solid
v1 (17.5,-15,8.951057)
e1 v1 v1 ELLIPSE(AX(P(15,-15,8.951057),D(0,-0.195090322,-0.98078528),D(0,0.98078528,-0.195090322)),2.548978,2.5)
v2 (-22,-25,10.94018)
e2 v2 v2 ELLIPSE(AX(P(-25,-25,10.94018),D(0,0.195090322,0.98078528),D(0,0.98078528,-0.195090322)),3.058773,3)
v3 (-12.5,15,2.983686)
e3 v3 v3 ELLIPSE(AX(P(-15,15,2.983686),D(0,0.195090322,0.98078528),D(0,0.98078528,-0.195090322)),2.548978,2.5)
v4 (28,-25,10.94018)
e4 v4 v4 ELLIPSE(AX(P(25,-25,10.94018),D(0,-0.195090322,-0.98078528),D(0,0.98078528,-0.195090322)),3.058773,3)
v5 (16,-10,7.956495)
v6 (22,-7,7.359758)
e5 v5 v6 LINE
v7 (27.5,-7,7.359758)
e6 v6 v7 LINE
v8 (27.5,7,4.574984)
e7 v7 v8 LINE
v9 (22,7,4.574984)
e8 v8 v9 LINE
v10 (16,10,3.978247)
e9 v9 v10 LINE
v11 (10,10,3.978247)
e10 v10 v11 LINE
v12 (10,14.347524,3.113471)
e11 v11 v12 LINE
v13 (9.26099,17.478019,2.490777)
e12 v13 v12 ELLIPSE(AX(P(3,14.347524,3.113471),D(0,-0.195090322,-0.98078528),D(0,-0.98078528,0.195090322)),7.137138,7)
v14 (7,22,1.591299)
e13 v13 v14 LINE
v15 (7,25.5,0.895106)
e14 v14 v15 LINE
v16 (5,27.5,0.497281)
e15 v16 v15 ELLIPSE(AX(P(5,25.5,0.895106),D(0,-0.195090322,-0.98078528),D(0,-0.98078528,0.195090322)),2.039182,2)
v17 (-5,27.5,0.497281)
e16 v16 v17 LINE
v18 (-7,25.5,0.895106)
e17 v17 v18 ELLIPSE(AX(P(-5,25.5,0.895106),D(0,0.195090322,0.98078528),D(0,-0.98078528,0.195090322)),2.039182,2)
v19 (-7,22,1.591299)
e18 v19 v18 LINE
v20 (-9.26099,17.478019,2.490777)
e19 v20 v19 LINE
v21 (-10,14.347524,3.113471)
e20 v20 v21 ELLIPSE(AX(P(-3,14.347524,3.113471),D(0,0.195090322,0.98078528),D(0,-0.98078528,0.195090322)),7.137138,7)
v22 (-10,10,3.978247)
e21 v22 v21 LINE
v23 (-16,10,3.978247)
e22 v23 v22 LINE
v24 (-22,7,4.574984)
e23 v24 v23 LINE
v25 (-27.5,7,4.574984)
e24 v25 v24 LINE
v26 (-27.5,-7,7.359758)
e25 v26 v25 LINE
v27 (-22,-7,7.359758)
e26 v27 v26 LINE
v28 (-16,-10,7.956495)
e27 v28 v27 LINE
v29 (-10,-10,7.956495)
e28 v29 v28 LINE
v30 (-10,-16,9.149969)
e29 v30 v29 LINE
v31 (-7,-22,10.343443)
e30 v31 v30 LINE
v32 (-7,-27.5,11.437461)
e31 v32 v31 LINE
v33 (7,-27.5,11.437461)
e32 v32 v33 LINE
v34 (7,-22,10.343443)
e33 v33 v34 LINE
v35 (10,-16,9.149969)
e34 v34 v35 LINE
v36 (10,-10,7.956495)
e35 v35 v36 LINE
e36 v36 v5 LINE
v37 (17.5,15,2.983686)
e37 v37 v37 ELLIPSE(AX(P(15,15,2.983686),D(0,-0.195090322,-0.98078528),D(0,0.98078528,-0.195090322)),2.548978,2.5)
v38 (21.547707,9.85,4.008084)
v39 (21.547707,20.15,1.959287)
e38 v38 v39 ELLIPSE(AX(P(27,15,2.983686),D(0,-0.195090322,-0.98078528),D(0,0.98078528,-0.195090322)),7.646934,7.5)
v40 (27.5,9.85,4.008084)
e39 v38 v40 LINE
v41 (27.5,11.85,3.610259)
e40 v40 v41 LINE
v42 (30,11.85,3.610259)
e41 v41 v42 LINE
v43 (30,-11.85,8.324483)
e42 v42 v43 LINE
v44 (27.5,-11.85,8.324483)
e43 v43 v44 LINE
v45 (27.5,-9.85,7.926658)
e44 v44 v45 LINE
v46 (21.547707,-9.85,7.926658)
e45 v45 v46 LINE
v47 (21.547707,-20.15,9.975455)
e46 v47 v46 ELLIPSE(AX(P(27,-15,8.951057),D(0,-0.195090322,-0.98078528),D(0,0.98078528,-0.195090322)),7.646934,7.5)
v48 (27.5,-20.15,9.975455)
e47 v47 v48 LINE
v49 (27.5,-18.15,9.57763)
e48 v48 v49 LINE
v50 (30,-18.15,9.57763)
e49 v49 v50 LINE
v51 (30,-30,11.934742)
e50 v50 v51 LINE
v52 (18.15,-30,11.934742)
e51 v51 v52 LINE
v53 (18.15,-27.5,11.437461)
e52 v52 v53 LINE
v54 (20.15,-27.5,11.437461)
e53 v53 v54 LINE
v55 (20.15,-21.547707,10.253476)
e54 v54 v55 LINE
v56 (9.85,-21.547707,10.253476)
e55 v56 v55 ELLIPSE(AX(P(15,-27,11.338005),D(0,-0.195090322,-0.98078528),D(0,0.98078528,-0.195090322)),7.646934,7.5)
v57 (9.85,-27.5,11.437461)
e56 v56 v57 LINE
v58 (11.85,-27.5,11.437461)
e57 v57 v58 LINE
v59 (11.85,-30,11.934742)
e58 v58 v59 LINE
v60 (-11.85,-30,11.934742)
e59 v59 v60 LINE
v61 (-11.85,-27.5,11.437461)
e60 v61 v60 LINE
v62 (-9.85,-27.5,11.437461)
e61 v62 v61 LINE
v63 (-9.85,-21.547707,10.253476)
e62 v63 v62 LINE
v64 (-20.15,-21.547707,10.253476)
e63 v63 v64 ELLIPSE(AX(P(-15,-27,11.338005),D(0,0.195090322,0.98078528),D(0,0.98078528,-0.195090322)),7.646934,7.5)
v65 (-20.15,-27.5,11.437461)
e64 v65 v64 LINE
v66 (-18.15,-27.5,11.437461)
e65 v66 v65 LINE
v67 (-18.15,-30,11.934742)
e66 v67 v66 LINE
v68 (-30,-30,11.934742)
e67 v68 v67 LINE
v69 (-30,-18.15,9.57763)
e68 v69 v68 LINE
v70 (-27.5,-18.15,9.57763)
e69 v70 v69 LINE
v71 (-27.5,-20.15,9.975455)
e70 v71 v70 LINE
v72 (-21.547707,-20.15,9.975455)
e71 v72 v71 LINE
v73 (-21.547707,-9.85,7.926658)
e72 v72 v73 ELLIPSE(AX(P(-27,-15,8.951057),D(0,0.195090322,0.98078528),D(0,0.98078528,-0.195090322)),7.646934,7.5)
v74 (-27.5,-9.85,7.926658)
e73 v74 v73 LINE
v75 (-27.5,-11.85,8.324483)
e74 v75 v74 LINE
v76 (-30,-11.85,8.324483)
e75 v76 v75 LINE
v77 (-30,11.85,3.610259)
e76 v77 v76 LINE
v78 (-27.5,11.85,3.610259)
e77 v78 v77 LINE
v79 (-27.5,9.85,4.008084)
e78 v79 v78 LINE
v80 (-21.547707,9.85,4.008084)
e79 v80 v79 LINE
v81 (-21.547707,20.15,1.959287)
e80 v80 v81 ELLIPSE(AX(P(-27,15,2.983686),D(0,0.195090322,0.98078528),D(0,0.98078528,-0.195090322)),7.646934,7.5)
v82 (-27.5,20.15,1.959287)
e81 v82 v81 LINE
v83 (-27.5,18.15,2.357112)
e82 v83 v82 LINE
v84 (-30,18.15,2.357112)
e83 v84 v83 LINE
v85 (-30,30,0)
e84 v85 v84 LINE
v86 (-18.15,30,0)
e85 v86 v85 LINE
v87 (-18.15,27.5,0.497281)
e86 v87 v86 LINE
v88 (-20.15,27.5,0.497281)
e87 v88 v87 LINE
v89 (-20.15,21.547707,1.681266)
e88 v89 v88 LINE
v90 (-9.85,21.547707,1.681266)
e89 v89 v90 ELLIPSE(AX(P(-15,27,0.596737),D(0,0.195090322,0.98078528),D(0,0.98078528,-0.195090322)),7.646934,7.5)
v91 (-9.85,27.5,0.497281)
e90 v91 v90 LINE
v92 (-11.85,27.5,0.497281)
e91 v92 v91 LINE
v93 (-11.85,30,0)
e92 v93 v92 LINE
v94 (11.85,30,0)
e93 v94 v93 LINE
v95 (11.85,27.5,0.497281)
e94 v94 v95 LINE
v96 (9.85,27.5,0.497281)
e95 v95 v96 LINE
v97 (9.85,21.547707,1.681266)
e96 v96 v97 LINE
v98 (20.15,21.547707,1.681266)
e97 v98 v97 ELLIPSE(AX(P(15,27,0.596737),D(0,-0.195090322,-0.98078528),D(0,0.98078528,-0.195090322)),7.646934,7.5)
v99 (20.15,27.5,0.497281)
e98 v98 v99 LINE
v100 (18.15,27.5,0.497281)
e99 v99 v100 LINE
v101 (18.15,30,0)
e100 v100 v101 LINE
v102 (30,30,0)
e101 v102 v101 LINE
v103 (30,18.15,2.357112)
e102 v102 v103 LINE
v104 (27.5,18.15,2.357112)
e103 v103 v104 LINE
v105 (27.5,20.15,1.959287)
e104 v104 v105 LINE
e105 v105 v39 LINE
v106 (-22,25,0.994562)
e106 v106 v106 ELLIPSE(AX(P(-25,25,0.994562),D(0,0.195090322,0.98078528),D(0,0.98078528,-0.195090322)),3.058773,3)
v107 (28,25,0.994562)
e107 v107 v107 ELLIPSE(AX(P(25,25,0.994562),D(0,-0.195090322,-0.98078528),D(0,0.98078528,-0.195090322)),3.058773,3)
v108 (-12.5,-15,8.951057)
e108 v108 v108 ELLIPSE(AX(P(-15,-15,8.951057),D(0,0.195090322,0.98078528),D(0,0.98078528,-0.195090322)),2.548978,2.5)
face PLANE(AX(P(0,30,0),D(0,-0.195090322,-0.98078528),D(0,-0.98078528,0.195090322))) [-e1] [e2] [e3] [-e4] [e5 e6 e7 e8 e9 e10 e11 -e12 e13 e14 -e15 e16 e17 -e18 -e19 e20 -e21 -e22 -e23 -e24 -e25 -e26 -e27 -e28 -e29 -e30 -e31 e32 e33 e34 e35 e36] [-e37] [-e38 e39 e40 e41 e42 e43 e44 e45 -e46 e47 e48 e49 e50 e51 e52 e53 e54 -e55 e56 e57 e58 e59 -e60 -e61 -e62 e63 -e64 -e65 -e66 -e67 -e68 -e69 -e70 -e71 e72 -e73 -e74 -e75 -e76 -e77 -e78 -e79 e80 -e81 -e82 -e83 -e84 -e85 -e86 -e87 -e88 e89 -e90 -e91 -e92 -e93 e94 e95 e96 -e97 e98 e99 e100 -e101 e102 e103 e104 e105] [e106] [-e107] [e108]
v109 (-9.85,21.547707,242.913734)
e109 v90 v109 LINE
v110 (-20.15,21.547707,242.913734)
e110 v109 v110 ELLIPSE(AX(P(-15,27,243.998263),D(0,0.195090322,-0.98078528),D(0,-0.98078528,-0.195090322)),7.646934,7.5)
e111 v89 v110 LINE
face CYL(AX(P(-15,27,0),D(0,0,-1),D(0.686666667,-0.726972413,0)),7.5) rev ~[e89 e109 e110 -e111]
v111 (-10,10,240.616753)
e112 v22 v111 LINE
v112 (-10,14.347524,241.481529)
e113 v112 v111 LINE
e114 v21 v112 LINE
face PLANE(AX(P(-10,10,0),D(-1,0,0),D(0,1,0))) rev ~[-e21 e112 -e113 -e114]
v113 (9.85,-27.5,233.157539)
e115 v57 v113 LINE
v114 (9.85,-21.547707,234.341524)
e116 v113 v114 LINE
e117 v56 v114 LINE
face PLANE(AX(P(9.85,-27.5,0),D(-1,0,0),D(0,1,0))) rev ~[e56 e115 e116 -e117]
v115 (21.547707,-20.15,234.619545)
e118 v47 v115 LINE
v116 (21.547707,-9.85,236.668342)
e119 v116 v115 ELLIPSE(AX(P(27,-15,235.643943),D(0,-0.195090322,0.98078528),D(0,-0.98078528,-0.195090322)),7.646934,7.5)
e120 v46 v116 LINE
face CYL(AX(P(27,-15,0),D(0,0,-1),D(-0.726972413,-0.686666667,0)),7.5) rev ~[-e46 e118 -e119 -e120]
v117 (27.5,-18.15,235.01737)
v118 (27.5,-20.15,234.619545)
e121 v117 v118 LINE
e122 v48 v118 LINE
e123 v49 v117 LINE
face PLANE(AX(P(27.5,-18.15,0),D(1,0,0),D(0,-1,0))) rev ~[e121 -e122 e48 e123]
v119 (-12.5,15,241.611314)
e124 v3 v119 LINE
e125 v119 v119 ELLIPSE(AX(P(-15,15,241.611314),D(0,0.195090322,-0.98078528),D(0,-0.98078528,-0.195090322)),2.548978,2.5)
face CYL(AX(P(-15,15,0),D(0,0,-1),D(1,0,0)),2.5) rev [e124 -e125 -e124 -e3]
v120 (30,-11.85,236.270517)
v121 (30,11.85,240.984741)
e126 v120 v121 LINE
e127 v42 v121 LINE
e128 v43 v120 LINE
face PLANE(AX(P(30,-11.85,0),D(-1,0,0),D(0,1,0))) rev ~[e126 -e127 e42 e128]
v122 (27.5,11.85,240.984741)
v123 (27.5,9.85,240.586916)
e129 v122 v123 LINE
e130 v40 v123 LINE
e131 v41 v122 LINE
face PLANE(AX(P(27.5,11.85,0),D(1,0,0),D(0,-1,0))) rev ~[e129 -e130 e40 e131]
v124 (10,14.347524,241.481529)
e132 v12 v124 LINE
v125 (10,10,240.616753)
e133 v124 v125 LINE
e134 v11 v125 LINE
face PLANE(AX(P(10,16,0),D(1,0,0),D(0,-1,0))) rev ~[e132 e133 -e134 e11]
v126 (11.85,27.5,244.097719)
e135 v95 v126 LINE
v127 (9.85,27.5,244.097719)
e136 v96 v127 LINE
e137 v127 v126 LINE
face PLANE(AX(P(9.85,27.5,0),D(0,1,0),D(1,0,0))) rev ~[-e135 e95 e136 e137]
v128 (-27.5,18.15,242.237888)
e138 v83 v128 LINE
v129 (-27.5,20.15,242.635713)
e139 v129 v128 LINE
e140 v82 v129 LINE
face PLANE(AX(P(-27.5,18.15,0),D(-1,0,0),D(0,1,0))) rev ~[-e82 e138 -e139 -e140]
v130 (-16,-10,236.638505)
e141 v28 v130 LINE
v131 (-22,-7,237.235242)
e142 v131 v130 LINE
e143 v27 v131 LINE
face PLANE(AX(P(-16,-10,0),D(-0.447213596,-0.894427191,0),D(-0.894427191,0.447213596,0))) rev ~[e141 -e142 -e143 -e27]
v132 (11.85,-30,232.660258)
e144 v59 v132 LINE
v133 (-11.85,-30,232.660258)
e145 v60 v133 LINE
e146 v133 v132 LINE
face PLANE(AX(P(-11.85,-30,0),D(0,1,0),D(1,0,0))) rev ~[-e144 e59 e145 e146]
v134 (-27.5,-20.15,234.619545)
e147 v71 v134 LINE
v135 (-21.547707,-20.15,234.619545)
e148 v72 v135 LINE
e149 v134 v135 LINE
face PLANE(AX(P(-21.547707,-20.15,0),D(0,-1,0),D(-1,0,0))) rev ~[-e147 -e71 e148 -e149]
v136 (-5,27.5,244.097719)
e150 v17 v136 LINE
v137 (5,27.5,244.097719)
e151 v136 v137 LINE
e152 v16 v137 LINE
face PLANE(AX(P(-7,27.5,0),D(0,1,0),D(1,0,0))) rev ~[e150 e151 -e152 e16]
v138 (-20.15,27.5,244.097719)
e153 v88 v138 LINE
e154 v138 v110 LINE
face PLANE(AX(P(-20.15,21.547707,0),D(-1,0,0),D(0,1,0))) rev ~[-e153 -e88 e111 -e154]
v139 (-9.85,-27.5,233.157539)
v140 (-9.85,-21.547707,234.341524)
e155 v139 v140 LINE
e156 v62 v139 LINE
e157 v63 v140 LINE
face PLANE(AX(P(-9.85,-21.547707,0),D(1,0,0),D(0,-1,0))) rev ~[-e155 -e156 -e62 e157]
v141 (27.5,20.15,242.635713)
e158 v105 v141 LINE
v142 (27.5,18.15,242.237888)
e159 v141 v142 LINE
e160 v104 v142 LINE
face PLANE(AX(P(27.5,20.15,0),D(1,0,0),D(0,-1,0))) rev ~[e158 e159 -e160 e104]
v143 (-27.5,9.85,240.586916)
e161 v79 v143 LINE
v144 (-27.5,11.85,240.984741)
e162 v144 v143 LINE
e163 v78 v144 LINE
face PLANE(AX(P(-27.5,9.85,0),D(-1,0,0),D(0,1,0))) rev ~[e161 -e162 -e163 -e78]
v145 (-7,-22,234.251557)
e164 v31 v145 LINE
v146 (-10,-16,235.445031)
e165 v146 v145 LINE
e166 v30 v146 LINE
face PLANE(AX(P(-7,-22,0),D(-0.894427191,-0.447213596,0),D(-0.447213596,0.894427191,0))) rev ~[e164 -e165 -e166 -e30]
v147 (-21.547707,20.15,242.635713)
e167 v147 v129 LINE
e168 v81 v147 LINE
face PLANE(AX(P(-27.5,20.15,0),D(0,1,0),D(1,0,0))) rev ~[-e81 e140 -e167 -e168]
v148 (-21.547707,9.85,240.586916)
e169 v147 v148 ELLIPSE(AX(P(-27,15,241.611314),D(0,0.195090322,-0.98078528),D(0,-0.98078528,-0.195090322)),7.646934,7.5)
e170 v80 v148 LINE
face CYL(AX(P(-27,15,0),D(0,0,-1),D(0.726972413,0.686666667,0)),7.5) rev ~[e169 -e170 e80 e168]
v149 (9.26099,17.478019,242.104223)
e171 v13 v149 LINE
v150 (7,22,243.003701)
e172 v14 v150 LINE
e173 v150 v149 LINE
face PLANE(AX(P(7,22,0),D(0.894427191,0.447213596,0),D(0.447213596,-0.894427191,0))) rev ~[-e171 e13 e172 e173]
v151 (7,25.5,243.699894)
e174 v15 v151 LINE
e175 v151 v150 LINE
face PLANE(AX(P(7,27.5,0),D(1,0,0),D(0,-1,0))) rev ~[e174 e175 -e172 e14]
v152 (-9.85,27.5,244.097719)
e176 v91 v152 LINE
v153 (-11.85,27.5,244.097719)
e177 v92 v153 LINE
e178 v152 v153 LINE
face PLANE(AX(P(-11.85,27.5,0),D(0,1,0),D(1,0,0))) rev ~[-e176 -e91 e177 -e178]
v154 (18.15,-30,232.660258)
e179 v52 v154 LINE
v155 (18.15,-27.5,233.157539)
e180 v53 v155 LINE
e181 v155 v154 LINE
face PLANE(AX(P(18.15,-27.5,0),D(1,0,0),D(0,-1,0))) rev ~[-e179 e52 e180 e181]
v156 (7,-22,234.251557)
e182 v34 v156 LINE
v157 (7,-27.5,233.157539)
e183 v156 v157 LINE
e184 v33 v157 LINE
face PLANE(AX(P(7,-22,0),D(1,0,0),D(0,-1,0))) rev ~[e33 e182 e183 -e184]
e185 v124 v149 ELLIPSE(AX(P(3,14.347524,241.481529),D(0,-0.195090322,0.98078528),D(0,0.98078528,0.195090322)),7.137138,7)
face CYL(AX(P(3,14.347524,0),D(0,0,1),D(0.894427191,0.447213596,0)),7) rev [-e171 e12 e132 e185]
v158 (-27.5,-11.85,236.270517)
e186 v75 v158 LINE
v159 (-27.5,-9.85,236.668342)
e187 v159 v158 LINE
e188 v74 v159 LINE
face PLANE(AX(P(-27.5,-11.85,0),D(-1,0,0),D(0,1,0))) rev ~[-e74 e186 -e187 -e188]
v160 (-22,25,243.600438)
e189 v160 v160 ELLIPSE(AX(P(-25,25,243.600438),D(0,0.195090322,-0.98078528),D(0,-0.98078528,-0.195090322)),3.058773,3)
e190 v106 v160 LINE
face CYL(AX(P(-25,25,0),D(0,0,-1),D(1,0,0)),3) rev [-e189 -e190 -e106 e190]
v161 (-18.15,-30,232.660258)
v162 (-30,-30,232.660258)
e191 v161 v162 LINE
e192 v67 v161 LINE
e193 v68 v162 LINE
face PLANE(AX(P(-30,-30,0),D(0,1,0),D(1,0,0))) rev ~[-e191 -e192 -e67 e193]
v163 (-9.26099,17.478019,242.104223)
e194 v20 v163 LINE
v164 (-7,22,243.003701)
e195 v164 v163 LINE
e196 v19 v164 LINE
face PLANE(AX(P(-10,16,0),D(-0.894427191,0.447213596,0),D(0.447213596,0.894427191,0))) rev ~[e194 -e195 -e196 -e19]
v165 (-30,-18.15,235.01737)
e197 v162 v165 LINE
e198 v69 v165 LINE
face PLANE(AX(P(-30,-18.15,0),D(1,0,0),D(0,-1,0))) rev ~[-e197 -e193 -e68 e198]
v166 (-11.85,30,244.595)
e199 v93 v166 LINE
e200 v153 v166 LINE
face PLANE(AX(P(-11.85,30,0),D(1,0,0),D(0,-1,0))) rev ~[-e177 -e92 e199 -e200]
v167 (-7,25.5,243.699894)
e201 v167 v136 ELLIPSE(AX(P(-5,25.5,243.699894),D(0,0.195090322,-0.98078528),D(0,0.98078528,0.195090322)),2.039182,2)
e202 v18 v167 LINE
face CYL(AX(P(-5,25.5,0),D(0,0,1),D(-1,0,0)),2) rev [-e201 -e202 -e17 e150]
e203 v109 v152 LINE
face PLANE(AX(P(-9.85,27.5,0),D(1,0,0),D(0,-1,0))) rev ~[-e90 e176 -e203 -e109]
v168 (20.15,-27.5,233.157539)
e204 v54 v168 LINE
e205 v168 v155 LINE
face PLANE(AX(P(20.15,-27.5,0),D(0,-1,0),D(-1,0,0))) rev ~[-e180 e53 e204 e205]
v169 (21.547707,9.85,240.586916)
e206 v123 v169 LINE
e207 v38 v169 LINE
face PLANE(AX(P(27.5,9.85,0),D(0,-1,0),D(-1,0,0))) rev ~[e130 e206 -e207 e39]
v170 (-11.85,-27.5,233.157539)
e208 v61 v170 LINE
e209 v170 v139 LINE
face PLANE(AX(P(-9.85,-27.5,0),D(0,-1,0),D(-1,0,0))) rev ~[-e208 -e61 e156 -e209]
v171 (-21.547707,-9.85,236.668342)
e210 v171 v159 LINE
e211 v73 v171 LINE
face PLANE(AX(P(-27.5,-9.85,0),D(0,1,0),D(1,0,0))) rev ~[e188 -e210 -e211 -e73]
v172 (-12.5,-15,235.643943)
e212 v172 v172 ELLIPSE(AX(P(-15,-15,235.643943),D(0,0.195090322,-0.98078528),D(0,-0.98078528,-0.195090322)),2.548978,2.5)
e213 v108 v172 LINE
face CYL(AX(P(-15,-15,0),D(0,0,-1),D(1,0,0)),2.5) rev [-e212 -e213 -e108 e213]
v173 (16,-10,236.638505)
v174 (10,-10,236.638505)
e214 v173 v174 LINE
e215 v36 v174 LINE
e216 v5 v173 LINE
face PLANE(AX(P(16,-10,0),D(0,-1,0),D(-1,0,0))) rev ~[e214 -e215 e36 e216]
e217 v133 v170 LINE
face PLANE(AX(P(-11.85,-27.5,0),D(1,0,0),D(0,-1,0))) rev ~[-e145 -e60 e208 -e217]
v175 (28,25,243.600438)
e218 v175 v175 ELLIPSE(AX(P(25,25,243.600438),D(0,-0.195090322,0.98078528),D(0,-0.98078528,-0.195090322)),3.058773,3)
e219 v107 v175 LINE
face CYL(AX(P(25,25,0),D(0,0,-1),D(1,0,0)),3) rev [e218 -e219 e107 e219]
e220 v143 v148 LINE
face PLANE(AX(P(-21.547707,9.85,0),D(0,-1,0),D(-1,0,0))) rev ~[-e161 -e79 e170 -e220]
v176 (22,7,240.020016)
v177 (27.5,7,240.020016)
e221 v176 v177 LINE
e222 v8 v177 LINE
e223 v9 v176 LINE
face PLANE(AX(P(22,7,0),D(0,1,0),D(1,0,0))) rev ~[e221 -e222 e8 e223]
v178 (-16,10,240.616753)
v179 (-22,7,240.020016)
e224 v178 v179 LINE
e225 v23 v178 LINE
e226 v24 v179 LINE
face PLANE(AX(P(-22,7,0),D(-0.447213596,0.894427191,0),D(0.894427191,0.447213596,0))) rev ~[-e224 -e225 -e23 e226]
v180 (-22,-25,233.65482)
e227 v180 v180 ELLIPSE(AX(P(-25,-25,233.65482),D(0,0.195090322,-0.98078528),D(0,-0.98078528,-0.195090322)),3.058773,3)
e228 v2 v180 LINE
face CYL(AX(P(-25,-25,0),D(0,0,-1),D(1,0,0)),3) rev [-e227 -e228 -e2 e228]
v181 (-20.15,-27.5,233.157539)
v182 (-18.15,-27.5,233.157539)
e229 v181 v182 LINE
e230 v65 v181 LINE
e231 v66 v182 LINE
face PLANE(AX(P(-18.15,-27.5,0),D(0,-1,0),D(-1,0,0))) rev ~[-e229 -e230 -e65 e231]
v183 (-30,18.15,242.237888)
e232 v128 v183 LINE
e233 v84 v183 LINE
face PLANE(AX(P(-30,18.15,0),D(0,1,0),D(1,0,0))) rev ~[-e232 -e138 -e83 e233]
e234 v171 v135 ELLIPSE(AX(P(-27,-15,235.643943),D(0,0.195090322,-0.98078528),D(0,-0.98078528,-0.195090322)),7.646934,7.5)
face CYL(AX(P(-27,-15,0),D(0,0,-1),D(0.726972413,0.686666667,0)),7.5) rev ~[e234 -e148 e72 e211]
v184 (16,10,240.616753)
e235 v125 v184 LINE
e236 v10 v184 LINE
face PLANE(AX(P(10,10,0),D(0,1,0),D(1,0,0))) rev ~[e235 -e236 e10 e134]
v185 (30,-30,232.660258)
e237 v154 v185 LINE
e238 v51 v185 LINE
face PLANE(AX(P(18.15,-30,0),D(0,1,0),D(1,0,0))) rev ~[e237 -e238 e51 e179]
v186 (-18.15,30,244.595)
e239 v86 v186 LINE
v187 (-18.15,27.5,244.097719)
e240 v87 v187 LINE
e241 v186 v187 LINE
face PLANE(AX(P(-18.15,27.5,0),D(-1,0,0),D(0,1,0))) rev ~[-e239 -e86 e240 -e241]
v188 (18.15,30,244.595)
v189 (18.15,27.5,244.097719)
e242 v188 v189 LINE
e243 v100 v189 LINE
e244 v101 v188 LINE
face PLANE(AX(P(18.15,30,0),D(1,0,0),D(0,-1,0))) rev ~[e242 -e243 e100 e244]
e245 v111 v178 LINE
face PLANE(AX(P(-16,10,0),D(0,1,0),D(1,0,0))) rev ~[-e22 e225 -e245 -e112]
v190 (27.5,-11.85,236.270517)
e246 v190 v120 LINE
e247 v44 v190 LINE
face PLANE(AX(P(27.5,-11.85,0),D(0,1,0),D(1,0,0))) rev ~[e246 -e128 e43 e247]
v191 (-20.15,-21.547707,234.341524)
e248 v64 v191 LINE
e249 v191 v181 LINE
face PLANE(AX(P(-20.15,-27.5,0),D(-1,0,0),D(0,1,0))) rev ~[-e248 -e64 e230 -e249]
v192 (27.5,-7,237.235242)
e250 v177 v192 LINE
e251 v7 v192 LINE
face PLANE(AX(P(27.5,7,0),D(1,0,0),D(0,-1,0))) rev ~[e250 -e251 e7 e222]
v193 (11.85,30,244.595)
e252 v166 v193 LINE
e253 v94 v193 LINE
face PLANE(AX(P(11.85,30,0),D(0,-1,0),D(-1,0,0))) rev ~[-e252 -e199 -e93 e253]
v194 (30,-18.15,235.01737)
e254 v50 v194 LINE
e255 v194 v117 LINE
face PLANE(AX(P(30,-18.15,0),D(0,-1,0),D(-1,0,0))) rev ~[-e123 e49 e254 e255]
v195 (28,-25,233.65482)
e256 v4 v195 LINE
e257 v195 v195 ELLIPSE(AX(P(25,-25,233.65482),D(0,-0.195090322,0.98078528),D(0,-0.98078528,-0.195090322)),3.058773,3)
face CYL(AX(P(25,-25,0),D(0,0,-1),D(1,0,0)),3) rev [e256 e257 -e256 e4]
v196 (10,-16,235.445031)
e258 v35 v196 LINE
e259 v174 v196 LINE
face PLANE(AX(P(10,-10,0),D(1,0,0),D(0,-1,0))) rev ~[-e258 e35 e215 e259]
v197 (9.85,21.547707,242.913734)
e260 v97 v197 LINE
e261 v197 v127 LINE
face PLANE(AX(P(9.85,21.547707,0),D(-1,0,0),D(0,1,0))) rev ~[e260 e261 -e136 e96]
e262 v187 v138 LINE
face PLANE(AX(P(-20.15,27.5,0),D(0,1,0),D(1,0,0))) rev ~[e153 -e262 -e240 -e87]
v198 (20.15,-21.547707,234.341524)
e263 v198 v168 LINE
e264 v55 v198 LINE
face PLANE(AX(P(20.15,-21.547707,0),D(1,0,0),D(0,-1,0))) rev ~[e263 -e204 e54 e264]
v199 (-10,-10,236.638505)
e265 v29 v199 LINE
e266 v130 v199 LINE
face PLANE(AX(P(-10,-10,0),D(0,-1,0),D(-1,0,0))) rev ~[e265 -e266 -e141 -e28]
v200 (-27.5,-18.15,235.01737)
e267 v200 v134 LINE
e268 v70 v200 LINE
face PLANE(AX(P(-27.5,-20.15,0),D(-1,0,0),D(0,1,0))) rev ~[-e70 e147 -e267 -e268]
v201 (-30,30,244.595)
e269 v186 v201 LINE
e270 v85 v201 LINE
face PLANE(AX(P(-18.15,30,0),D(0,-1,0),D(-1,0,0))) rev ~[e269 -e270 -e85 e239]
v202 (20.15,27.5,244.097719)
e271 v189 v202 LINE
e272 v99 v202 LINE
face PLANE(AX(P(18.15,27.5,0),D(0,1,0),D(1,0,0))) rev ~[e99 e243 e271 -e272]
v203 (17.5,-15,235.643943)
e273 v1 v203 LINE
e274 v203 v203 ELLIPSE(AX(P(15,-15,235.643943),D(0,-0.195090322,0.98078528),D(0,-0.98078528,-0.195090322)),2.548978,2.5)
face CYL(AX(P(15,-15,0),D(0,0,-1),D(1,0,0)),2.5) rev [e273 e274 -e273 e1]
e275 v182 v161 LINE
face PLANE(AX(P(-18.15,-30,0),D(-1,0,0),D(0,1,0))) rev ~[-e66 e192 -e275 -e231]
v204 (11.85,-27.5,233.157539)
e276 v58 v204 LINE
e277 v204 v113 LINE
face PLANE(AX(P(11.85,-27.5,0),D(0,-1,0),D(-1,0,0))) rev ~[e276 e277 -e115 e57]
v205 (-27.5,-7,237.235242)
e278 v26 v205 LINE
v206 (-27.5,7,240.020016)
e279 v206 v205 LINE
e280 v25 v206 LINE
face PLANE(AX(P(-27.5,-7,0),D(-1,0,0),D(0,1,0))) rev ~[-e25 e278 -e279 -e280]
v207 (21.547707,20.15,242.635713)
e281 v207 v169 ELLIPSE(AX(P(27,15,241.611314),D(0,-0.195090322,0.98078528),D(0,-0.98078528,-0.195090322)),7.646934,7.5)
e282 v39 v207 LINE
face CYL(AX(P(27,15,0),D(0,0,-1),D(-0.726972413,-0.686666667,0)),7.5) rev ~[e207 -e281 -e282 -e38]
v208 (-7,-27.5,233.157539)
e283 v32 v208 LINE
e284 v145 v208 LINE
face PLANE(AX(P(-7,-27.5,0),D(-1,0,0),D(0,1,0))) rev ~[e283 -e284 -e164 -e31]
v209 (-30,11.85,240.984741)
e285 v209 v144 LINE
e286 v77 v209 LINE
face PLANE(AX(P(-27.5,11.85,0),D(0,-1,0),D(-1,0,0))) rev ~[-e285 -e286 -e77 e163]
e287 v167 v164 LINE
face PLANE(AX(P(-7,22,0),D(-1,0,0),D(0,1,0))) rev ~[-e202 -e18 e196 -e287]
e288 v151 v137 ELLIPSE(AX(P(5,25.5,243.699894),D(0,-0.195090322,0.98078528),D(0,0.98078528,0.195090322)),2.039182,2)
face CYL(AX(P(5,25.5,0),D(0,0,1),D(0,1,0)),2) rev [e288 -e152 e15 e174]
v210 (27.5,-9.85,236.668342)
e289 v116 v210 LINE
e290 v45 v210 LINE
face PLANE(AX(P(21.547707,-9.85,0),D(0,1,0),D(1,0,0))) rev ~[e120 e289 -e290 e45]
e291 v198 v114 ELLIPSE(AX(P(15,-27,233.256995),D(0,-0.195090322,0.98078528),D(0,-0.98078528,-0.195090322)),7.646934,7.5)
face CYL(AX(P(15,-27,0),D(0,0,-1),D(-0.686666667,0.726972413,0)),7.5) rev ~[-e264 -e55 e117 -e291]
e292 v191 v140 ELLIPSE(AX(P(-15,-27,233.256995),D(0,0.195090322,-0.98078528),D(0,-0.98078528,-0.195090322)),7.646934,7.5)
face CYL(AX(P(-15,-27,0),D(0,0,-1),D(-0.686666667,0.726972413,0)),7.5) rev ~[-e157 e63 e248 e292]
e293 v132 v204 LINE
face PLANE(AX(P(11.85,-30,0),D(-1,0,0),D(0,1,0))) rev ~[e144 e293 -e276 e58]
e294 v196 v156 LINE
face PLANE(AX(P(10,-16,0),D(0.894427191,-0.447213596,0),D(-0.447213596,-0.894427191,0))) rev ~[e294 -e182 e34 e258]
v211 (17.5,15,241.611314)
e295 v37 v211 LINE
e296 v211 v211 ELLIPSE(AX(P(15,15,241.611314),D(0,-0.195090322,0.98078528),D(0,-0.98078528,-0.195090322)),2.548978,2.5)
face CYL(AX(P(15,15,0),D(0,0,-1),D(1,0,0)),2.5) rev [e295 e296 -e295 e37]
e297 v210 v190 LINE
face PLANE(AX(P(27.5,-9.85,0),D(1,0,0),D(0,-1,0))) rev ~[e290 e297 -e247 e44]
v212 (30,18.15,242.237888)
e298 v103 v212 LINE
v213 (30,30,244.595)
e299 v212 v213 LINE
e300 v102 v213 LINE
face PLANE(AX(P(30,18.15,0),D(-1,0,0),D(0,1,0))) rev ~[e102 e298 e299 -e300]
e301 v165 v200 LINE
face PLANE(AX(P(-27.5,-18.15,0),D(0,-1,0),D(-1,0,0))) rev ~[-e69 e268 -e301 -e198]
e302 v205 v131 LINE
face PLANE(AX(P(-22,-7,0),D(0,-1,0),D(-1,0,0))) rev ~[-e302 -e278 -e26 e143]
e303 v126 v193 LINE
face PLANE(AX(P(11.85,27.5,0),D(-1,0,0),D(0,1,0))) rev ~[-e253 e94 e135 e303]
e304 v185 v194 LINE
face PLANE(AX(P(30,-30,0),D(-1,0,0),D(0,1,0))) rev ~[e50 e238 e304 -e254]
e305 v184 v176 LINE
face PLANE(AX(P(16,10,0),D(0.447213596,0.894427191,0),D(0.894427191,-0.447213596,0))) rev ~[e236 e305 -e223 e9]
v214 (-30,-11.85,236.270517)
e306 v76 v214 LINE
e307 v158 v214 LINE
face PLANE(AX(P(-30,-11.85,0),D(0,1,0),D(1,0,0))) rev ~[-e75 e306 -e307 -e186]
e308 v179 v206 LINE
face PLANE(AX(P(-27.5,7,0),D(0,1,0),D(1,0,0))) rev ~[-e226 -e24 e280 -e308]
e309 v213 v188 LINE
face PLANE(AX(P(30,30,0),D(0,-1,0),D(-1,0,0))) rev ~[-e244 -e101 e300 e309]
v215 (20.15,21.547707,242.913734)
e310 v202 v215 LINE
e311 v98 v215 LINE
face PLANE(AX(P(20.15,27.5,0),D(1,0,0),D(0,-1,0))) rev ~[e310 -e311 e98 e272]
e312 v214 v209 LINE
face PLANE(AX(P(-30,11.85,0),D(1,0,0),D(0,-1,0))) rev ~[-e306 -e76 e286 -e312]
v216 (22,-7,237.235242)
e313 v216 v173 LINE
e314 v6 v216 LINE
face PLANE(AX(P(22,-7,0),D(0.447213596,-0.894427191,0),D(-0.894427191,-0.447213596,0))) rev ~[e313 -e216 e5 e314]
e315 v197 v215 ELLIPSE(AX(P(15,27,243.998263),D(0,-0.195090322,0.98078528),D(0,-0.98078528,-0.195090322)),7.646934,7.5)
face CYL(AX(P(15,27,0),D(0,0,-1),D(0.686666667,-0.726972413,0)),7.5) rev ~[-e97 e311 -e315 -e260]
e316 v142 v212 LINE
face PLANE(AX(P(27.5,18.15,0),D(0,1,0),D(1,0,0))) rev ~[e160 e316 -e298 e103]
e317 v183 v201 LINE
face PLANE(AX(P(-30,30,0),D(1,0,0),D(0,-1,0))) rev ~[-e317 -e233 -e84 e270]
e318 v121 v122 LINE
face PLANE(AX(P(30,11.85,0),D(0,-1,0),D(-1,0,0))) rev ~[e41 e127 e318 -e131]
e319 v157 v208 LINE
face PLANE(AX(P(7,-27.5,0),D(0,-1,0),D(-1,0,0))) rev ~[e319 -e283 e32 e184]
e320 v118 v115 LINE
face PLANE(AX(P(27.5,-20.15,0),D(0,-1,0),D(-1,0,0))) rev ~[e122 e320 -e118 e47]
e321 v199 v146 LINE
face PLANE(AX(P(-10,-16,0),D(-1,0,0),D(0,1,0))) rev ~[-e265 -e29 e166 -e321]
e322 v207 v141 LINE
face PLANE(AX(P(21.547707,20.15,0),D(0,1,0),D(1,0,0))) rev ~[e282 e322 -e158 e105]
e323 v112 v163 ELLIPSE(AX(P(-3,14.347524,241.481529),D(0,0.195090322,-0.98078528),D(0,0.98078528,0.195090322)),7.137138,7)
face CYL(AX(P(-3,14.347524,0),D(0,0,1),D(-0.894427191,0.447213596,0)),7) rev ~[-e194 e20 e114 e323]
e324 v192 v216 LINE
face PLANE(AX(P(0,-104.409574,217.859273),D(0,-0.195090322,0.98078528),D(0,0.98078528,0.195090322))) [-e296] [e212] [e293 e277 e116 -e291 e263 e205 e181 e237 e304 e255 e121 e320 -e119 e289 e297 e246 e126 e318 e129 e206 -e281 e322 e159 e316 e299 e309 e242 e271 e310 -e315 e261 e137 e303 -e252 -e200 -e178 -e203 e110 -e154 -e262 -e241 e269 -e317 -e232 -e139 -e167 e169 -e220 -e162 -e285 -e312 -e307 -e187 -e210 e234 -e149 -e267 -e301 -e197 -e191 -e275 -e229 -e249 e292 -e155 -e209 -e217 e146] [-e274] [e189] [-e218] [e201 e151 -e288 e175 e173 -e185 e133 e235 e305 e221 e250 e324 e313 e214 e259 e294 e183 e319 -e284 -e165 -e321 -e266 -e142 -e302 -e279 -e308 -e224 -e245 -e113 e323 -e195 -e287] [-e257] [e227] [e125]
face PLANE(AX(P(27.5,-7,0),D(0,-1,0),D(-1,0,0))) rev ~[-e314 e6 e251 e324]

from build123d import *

# Parameters (mm, degrees)
F0_R          = 3
F0_R_2        = 2.5
F1_DEPTH      = 244.595
F2_R          = 2
F3_R          = 7
F5_DEPTH      = 30
F5_DEPTH_BACK = 30


# Not quite as in the source:
# - a feature names something its author has since deleted; it is built from what else it names


with BuildPart() as f1:
    # F0 (on Top) → F1 (new body)
    with BuildSketch(Plane.XY):
        with BuildLine():
            Line((18.15, -30), (30, -30))
            Line((30, -30), (30, -18.15))
            Line((30, -18.15), (27.5, -18.15))
            Line((27.5, -18.15), (27.5, -20.15))
            Line((27.5, -20.15), (21.5477069044, -20.15))
            ThreePointArc((21.5477069044, -20.15), (19.5, -15), (21.5477069044, -9.85))
            Line((21.5477069044, -9.85), (27.5, -9.85))
            Line((27.5, -9.85), (27.5, -11.85))
            Line((27.5, -11.85), (30, -11.85))
            Line((30, -11.85), (30, 11.85))
            Line((30, 11.85), (27.5, 11.85))
            Line((27.5, 11.85), (27.5, 9.85))
            Line((27.5, 9.85), (21.5477069044, 9.85))
            ThreePointArc((21.5477069044, 9.85), (19.5, 15), (21.5477069044, 20.15))
            Line((21.5477069044, 20.15), (27.5, 20.15))
            Line((27.5, 20.15), (27.5, 18.15))
            Line((27.5, 18.15), (30, 18.15))
            Line((30, 18.15), (30, 30))
            Line((30, 30), (18.15, 30))
            Line((18.15, 30), (18.15, 27.5))
            Line((18.15, 27.5), (20.15, 27.5))
            Line((20.15, 27.5), (20.15, 21.5477069044))
            ThreePointArc((20.15, 21.5477069044), (15, 19.5), (9.85, 21.5477069044))
            Line((9.85, 21.5477069044), (9.85, 27.5))
            Line((9.85, 27.5), (11.85, 27.5))
            Line((11.85, 27.5), (11.85, 30))
            Line((11.85, 30), (-11.85, 30))
            Line((-11.85, 30), (-11.85, 27.5))
            Line((-11.85, 27.5), (-9.85, 27.5))
            Line((-9.85, 27.5), (-9.85, 21.5477069044))
            ThreePointArc((-9.85, 21.5477069044), (-15, 19.5), (-20.15, 21.5477069044))
            Line((-20.15, 21.5477069044), (-20.15, 27.5))
            Line((-20.15, 27.5), (-18.15, 27.5))
            Line((-18.15, 27.5), (-18.15, 30))
            Line((-18.15, 30), (-30, 30))
            Line((-30, 30), (-30, 18.15))
            Line((-30, 18.15), (-27.5, 18.15))
            Line((-27.5, 18.15), (-27.5, 20.15))
            Line((-27.5, 20.15), (-21.5477069044, 20.15))
            ThreePointArc((-21.5477069044, 20.15), (-19.5, 15), (-21.5477069044, 9.85))
            Line((-21.5477069044, 9.85), (-27.5, 9.85))
            Line((-27.5, 9.85), (-27.5, 11.85))
            Line((-27.5, 11.85), (-30, 11.85))
            Line((-30, 11.85), (-30, -11.85))
            Line((-30, -11.85), (-27.5, -11.85))
            Line((-27.5, -11.85), (-27.5, -9.85))
            Line((-27.5, -9.85), (-21.5477069044, -9.85))
            ThreePointArc((-21.5477069044, -9.85), (-19.5, -15), (-21.5477069044, -20.15))
            Line((-21.5477069044, -20.15), (-27.5, -20.15))
            Line((-27.5, -20.15), (-27.5, -18.15))
            Line((-27.5, -18.15), (-30, -18.15))
            Line((-30, -18.15), (-30, -30))
            Line((-30, -30), (-18.15, -30))
            Line((-18.15, -30), (-18.15, -27.5))
            Line((-18.15, -27.5), (-20.15, -27.5))
            Line((-20.15, -27.5), (-20.15, -21.5477069044))
            ThreePointArc((-20.15, -21.5477069044), (-15, -19.5), (-9.85, -21.5477069044))
            Line((-9.85, -21.5477069044), (-9.85, -27.5))
            Line((-9.85, -27.5), (-11.85, -27.5))
            Line((-11.85, -27.5), (-11.85, -30))
            Line((-11.85, -30), (11.85, -30))
            Line((11.85, -30), (11.85, -27.5))
            Line((11.85, -27.5), (9.85, -27.5))
            Line((9.85, -27.5), (9.85, -21.5477069044))
            ThreePointArc((9.85, -21.5477069044), (15, -19.5), (20.15, -21.5477069044))
            Line((20.15, -21.5477069044), (20.15, -27.5))
            Line((20.15, -27.5), (18.15, -27.5))
            Line((18.15, -27.5), (18.15, -30))
        make_face()
        with Locations((-25, -25)):
            Circle(F0_R, mode=Mode.SUBTRACT)
        with Locations((-15, -15)):
            Circle(F0_R_2, mode=Mode.SUBTRACT)
        with Locations((25, -25)):
            Circle(F0_R, mode=Mode.SUBTRACT)
        with Locations((15, -15)):
            Circle(F0_R_2, mode=Mode.SUBTRACT)
        with Locations((-25, 25)):
            Circle(F0_R, mode=Mode.SUBTRACT)
        with Locations((-15, 15)):
            Circle(F0_R_2, mode=Mode.SUBTRACT)
        Polygon((-7, 22), (-7, 27.5), (0, 27.5), (7, 27.5), (7, 22), (10, 16), (10, 10), (16, 10), (22, 7), (27.5, 7), (27.5, 0), (27.5, -7), (22, -7), (16, -10), (10, -10), (10, -16), (7, -22), (7, -27.5), (0, -27.5), (-7, -27.5), (-7, -22), (-10, -16), (-10, -10), (-16, -10), (-22, -7), (-27.5, -7), (-27.5, 0), (-27.5, 7), (-22, 7), (-16, 10), (-10, 10), (-10, 16), align=None, mode=Mode.SUBTRACT)
        with Locations((15, 15)):
            Circle(F0_R_2, mode=Mode.SUBTRACT)
        with Locations((25, 25)):
            Circle(F0_R, mode=Mode.SUBTRACT)
    extrude(amount=F1_DEPTH)

    # F2
    f2_edges = [f1.edges().sort_by_distance(p)[0] for p in [
        (-7, 27.5, 122.2975),
        (7, 27.5, 122.2975),
    ]]
    fillet(f2_edges, radius=F2_R)

    # F3
    f3_edges = [f1.edges().sort_by_distance(p)[0] for p in [
        (-10, 16, 122.2975),
        (10, 16, 122.2975),
    ]]
    fillet(f3_edges, radius=F3_R)

    # F4 (on Right) → F5 (cut, two sides)
    with BuildSketch(Plane.YZ) as f5_sk:
        Polygon((6.0593712047, -120.3576686088), (30, 0), (-94.0233882431, 24.6697857659), (-117.9640170384, -95.6878828429), align=None)
        Polygon((30, 244.595), (11.5280437604, 337.4597951001), (-122.8815300181, 310.7240685814), (-104.4095737785, 217.8592734812), align=None)
    extrude(amount=-F5_DEPTH, mode=Mode.SUBTRACT)
    extrude(f5_sk.sketch, amount=F5_DEPTH_BACK, mode=Mode.SUBTRACT)


solid = f1.part
